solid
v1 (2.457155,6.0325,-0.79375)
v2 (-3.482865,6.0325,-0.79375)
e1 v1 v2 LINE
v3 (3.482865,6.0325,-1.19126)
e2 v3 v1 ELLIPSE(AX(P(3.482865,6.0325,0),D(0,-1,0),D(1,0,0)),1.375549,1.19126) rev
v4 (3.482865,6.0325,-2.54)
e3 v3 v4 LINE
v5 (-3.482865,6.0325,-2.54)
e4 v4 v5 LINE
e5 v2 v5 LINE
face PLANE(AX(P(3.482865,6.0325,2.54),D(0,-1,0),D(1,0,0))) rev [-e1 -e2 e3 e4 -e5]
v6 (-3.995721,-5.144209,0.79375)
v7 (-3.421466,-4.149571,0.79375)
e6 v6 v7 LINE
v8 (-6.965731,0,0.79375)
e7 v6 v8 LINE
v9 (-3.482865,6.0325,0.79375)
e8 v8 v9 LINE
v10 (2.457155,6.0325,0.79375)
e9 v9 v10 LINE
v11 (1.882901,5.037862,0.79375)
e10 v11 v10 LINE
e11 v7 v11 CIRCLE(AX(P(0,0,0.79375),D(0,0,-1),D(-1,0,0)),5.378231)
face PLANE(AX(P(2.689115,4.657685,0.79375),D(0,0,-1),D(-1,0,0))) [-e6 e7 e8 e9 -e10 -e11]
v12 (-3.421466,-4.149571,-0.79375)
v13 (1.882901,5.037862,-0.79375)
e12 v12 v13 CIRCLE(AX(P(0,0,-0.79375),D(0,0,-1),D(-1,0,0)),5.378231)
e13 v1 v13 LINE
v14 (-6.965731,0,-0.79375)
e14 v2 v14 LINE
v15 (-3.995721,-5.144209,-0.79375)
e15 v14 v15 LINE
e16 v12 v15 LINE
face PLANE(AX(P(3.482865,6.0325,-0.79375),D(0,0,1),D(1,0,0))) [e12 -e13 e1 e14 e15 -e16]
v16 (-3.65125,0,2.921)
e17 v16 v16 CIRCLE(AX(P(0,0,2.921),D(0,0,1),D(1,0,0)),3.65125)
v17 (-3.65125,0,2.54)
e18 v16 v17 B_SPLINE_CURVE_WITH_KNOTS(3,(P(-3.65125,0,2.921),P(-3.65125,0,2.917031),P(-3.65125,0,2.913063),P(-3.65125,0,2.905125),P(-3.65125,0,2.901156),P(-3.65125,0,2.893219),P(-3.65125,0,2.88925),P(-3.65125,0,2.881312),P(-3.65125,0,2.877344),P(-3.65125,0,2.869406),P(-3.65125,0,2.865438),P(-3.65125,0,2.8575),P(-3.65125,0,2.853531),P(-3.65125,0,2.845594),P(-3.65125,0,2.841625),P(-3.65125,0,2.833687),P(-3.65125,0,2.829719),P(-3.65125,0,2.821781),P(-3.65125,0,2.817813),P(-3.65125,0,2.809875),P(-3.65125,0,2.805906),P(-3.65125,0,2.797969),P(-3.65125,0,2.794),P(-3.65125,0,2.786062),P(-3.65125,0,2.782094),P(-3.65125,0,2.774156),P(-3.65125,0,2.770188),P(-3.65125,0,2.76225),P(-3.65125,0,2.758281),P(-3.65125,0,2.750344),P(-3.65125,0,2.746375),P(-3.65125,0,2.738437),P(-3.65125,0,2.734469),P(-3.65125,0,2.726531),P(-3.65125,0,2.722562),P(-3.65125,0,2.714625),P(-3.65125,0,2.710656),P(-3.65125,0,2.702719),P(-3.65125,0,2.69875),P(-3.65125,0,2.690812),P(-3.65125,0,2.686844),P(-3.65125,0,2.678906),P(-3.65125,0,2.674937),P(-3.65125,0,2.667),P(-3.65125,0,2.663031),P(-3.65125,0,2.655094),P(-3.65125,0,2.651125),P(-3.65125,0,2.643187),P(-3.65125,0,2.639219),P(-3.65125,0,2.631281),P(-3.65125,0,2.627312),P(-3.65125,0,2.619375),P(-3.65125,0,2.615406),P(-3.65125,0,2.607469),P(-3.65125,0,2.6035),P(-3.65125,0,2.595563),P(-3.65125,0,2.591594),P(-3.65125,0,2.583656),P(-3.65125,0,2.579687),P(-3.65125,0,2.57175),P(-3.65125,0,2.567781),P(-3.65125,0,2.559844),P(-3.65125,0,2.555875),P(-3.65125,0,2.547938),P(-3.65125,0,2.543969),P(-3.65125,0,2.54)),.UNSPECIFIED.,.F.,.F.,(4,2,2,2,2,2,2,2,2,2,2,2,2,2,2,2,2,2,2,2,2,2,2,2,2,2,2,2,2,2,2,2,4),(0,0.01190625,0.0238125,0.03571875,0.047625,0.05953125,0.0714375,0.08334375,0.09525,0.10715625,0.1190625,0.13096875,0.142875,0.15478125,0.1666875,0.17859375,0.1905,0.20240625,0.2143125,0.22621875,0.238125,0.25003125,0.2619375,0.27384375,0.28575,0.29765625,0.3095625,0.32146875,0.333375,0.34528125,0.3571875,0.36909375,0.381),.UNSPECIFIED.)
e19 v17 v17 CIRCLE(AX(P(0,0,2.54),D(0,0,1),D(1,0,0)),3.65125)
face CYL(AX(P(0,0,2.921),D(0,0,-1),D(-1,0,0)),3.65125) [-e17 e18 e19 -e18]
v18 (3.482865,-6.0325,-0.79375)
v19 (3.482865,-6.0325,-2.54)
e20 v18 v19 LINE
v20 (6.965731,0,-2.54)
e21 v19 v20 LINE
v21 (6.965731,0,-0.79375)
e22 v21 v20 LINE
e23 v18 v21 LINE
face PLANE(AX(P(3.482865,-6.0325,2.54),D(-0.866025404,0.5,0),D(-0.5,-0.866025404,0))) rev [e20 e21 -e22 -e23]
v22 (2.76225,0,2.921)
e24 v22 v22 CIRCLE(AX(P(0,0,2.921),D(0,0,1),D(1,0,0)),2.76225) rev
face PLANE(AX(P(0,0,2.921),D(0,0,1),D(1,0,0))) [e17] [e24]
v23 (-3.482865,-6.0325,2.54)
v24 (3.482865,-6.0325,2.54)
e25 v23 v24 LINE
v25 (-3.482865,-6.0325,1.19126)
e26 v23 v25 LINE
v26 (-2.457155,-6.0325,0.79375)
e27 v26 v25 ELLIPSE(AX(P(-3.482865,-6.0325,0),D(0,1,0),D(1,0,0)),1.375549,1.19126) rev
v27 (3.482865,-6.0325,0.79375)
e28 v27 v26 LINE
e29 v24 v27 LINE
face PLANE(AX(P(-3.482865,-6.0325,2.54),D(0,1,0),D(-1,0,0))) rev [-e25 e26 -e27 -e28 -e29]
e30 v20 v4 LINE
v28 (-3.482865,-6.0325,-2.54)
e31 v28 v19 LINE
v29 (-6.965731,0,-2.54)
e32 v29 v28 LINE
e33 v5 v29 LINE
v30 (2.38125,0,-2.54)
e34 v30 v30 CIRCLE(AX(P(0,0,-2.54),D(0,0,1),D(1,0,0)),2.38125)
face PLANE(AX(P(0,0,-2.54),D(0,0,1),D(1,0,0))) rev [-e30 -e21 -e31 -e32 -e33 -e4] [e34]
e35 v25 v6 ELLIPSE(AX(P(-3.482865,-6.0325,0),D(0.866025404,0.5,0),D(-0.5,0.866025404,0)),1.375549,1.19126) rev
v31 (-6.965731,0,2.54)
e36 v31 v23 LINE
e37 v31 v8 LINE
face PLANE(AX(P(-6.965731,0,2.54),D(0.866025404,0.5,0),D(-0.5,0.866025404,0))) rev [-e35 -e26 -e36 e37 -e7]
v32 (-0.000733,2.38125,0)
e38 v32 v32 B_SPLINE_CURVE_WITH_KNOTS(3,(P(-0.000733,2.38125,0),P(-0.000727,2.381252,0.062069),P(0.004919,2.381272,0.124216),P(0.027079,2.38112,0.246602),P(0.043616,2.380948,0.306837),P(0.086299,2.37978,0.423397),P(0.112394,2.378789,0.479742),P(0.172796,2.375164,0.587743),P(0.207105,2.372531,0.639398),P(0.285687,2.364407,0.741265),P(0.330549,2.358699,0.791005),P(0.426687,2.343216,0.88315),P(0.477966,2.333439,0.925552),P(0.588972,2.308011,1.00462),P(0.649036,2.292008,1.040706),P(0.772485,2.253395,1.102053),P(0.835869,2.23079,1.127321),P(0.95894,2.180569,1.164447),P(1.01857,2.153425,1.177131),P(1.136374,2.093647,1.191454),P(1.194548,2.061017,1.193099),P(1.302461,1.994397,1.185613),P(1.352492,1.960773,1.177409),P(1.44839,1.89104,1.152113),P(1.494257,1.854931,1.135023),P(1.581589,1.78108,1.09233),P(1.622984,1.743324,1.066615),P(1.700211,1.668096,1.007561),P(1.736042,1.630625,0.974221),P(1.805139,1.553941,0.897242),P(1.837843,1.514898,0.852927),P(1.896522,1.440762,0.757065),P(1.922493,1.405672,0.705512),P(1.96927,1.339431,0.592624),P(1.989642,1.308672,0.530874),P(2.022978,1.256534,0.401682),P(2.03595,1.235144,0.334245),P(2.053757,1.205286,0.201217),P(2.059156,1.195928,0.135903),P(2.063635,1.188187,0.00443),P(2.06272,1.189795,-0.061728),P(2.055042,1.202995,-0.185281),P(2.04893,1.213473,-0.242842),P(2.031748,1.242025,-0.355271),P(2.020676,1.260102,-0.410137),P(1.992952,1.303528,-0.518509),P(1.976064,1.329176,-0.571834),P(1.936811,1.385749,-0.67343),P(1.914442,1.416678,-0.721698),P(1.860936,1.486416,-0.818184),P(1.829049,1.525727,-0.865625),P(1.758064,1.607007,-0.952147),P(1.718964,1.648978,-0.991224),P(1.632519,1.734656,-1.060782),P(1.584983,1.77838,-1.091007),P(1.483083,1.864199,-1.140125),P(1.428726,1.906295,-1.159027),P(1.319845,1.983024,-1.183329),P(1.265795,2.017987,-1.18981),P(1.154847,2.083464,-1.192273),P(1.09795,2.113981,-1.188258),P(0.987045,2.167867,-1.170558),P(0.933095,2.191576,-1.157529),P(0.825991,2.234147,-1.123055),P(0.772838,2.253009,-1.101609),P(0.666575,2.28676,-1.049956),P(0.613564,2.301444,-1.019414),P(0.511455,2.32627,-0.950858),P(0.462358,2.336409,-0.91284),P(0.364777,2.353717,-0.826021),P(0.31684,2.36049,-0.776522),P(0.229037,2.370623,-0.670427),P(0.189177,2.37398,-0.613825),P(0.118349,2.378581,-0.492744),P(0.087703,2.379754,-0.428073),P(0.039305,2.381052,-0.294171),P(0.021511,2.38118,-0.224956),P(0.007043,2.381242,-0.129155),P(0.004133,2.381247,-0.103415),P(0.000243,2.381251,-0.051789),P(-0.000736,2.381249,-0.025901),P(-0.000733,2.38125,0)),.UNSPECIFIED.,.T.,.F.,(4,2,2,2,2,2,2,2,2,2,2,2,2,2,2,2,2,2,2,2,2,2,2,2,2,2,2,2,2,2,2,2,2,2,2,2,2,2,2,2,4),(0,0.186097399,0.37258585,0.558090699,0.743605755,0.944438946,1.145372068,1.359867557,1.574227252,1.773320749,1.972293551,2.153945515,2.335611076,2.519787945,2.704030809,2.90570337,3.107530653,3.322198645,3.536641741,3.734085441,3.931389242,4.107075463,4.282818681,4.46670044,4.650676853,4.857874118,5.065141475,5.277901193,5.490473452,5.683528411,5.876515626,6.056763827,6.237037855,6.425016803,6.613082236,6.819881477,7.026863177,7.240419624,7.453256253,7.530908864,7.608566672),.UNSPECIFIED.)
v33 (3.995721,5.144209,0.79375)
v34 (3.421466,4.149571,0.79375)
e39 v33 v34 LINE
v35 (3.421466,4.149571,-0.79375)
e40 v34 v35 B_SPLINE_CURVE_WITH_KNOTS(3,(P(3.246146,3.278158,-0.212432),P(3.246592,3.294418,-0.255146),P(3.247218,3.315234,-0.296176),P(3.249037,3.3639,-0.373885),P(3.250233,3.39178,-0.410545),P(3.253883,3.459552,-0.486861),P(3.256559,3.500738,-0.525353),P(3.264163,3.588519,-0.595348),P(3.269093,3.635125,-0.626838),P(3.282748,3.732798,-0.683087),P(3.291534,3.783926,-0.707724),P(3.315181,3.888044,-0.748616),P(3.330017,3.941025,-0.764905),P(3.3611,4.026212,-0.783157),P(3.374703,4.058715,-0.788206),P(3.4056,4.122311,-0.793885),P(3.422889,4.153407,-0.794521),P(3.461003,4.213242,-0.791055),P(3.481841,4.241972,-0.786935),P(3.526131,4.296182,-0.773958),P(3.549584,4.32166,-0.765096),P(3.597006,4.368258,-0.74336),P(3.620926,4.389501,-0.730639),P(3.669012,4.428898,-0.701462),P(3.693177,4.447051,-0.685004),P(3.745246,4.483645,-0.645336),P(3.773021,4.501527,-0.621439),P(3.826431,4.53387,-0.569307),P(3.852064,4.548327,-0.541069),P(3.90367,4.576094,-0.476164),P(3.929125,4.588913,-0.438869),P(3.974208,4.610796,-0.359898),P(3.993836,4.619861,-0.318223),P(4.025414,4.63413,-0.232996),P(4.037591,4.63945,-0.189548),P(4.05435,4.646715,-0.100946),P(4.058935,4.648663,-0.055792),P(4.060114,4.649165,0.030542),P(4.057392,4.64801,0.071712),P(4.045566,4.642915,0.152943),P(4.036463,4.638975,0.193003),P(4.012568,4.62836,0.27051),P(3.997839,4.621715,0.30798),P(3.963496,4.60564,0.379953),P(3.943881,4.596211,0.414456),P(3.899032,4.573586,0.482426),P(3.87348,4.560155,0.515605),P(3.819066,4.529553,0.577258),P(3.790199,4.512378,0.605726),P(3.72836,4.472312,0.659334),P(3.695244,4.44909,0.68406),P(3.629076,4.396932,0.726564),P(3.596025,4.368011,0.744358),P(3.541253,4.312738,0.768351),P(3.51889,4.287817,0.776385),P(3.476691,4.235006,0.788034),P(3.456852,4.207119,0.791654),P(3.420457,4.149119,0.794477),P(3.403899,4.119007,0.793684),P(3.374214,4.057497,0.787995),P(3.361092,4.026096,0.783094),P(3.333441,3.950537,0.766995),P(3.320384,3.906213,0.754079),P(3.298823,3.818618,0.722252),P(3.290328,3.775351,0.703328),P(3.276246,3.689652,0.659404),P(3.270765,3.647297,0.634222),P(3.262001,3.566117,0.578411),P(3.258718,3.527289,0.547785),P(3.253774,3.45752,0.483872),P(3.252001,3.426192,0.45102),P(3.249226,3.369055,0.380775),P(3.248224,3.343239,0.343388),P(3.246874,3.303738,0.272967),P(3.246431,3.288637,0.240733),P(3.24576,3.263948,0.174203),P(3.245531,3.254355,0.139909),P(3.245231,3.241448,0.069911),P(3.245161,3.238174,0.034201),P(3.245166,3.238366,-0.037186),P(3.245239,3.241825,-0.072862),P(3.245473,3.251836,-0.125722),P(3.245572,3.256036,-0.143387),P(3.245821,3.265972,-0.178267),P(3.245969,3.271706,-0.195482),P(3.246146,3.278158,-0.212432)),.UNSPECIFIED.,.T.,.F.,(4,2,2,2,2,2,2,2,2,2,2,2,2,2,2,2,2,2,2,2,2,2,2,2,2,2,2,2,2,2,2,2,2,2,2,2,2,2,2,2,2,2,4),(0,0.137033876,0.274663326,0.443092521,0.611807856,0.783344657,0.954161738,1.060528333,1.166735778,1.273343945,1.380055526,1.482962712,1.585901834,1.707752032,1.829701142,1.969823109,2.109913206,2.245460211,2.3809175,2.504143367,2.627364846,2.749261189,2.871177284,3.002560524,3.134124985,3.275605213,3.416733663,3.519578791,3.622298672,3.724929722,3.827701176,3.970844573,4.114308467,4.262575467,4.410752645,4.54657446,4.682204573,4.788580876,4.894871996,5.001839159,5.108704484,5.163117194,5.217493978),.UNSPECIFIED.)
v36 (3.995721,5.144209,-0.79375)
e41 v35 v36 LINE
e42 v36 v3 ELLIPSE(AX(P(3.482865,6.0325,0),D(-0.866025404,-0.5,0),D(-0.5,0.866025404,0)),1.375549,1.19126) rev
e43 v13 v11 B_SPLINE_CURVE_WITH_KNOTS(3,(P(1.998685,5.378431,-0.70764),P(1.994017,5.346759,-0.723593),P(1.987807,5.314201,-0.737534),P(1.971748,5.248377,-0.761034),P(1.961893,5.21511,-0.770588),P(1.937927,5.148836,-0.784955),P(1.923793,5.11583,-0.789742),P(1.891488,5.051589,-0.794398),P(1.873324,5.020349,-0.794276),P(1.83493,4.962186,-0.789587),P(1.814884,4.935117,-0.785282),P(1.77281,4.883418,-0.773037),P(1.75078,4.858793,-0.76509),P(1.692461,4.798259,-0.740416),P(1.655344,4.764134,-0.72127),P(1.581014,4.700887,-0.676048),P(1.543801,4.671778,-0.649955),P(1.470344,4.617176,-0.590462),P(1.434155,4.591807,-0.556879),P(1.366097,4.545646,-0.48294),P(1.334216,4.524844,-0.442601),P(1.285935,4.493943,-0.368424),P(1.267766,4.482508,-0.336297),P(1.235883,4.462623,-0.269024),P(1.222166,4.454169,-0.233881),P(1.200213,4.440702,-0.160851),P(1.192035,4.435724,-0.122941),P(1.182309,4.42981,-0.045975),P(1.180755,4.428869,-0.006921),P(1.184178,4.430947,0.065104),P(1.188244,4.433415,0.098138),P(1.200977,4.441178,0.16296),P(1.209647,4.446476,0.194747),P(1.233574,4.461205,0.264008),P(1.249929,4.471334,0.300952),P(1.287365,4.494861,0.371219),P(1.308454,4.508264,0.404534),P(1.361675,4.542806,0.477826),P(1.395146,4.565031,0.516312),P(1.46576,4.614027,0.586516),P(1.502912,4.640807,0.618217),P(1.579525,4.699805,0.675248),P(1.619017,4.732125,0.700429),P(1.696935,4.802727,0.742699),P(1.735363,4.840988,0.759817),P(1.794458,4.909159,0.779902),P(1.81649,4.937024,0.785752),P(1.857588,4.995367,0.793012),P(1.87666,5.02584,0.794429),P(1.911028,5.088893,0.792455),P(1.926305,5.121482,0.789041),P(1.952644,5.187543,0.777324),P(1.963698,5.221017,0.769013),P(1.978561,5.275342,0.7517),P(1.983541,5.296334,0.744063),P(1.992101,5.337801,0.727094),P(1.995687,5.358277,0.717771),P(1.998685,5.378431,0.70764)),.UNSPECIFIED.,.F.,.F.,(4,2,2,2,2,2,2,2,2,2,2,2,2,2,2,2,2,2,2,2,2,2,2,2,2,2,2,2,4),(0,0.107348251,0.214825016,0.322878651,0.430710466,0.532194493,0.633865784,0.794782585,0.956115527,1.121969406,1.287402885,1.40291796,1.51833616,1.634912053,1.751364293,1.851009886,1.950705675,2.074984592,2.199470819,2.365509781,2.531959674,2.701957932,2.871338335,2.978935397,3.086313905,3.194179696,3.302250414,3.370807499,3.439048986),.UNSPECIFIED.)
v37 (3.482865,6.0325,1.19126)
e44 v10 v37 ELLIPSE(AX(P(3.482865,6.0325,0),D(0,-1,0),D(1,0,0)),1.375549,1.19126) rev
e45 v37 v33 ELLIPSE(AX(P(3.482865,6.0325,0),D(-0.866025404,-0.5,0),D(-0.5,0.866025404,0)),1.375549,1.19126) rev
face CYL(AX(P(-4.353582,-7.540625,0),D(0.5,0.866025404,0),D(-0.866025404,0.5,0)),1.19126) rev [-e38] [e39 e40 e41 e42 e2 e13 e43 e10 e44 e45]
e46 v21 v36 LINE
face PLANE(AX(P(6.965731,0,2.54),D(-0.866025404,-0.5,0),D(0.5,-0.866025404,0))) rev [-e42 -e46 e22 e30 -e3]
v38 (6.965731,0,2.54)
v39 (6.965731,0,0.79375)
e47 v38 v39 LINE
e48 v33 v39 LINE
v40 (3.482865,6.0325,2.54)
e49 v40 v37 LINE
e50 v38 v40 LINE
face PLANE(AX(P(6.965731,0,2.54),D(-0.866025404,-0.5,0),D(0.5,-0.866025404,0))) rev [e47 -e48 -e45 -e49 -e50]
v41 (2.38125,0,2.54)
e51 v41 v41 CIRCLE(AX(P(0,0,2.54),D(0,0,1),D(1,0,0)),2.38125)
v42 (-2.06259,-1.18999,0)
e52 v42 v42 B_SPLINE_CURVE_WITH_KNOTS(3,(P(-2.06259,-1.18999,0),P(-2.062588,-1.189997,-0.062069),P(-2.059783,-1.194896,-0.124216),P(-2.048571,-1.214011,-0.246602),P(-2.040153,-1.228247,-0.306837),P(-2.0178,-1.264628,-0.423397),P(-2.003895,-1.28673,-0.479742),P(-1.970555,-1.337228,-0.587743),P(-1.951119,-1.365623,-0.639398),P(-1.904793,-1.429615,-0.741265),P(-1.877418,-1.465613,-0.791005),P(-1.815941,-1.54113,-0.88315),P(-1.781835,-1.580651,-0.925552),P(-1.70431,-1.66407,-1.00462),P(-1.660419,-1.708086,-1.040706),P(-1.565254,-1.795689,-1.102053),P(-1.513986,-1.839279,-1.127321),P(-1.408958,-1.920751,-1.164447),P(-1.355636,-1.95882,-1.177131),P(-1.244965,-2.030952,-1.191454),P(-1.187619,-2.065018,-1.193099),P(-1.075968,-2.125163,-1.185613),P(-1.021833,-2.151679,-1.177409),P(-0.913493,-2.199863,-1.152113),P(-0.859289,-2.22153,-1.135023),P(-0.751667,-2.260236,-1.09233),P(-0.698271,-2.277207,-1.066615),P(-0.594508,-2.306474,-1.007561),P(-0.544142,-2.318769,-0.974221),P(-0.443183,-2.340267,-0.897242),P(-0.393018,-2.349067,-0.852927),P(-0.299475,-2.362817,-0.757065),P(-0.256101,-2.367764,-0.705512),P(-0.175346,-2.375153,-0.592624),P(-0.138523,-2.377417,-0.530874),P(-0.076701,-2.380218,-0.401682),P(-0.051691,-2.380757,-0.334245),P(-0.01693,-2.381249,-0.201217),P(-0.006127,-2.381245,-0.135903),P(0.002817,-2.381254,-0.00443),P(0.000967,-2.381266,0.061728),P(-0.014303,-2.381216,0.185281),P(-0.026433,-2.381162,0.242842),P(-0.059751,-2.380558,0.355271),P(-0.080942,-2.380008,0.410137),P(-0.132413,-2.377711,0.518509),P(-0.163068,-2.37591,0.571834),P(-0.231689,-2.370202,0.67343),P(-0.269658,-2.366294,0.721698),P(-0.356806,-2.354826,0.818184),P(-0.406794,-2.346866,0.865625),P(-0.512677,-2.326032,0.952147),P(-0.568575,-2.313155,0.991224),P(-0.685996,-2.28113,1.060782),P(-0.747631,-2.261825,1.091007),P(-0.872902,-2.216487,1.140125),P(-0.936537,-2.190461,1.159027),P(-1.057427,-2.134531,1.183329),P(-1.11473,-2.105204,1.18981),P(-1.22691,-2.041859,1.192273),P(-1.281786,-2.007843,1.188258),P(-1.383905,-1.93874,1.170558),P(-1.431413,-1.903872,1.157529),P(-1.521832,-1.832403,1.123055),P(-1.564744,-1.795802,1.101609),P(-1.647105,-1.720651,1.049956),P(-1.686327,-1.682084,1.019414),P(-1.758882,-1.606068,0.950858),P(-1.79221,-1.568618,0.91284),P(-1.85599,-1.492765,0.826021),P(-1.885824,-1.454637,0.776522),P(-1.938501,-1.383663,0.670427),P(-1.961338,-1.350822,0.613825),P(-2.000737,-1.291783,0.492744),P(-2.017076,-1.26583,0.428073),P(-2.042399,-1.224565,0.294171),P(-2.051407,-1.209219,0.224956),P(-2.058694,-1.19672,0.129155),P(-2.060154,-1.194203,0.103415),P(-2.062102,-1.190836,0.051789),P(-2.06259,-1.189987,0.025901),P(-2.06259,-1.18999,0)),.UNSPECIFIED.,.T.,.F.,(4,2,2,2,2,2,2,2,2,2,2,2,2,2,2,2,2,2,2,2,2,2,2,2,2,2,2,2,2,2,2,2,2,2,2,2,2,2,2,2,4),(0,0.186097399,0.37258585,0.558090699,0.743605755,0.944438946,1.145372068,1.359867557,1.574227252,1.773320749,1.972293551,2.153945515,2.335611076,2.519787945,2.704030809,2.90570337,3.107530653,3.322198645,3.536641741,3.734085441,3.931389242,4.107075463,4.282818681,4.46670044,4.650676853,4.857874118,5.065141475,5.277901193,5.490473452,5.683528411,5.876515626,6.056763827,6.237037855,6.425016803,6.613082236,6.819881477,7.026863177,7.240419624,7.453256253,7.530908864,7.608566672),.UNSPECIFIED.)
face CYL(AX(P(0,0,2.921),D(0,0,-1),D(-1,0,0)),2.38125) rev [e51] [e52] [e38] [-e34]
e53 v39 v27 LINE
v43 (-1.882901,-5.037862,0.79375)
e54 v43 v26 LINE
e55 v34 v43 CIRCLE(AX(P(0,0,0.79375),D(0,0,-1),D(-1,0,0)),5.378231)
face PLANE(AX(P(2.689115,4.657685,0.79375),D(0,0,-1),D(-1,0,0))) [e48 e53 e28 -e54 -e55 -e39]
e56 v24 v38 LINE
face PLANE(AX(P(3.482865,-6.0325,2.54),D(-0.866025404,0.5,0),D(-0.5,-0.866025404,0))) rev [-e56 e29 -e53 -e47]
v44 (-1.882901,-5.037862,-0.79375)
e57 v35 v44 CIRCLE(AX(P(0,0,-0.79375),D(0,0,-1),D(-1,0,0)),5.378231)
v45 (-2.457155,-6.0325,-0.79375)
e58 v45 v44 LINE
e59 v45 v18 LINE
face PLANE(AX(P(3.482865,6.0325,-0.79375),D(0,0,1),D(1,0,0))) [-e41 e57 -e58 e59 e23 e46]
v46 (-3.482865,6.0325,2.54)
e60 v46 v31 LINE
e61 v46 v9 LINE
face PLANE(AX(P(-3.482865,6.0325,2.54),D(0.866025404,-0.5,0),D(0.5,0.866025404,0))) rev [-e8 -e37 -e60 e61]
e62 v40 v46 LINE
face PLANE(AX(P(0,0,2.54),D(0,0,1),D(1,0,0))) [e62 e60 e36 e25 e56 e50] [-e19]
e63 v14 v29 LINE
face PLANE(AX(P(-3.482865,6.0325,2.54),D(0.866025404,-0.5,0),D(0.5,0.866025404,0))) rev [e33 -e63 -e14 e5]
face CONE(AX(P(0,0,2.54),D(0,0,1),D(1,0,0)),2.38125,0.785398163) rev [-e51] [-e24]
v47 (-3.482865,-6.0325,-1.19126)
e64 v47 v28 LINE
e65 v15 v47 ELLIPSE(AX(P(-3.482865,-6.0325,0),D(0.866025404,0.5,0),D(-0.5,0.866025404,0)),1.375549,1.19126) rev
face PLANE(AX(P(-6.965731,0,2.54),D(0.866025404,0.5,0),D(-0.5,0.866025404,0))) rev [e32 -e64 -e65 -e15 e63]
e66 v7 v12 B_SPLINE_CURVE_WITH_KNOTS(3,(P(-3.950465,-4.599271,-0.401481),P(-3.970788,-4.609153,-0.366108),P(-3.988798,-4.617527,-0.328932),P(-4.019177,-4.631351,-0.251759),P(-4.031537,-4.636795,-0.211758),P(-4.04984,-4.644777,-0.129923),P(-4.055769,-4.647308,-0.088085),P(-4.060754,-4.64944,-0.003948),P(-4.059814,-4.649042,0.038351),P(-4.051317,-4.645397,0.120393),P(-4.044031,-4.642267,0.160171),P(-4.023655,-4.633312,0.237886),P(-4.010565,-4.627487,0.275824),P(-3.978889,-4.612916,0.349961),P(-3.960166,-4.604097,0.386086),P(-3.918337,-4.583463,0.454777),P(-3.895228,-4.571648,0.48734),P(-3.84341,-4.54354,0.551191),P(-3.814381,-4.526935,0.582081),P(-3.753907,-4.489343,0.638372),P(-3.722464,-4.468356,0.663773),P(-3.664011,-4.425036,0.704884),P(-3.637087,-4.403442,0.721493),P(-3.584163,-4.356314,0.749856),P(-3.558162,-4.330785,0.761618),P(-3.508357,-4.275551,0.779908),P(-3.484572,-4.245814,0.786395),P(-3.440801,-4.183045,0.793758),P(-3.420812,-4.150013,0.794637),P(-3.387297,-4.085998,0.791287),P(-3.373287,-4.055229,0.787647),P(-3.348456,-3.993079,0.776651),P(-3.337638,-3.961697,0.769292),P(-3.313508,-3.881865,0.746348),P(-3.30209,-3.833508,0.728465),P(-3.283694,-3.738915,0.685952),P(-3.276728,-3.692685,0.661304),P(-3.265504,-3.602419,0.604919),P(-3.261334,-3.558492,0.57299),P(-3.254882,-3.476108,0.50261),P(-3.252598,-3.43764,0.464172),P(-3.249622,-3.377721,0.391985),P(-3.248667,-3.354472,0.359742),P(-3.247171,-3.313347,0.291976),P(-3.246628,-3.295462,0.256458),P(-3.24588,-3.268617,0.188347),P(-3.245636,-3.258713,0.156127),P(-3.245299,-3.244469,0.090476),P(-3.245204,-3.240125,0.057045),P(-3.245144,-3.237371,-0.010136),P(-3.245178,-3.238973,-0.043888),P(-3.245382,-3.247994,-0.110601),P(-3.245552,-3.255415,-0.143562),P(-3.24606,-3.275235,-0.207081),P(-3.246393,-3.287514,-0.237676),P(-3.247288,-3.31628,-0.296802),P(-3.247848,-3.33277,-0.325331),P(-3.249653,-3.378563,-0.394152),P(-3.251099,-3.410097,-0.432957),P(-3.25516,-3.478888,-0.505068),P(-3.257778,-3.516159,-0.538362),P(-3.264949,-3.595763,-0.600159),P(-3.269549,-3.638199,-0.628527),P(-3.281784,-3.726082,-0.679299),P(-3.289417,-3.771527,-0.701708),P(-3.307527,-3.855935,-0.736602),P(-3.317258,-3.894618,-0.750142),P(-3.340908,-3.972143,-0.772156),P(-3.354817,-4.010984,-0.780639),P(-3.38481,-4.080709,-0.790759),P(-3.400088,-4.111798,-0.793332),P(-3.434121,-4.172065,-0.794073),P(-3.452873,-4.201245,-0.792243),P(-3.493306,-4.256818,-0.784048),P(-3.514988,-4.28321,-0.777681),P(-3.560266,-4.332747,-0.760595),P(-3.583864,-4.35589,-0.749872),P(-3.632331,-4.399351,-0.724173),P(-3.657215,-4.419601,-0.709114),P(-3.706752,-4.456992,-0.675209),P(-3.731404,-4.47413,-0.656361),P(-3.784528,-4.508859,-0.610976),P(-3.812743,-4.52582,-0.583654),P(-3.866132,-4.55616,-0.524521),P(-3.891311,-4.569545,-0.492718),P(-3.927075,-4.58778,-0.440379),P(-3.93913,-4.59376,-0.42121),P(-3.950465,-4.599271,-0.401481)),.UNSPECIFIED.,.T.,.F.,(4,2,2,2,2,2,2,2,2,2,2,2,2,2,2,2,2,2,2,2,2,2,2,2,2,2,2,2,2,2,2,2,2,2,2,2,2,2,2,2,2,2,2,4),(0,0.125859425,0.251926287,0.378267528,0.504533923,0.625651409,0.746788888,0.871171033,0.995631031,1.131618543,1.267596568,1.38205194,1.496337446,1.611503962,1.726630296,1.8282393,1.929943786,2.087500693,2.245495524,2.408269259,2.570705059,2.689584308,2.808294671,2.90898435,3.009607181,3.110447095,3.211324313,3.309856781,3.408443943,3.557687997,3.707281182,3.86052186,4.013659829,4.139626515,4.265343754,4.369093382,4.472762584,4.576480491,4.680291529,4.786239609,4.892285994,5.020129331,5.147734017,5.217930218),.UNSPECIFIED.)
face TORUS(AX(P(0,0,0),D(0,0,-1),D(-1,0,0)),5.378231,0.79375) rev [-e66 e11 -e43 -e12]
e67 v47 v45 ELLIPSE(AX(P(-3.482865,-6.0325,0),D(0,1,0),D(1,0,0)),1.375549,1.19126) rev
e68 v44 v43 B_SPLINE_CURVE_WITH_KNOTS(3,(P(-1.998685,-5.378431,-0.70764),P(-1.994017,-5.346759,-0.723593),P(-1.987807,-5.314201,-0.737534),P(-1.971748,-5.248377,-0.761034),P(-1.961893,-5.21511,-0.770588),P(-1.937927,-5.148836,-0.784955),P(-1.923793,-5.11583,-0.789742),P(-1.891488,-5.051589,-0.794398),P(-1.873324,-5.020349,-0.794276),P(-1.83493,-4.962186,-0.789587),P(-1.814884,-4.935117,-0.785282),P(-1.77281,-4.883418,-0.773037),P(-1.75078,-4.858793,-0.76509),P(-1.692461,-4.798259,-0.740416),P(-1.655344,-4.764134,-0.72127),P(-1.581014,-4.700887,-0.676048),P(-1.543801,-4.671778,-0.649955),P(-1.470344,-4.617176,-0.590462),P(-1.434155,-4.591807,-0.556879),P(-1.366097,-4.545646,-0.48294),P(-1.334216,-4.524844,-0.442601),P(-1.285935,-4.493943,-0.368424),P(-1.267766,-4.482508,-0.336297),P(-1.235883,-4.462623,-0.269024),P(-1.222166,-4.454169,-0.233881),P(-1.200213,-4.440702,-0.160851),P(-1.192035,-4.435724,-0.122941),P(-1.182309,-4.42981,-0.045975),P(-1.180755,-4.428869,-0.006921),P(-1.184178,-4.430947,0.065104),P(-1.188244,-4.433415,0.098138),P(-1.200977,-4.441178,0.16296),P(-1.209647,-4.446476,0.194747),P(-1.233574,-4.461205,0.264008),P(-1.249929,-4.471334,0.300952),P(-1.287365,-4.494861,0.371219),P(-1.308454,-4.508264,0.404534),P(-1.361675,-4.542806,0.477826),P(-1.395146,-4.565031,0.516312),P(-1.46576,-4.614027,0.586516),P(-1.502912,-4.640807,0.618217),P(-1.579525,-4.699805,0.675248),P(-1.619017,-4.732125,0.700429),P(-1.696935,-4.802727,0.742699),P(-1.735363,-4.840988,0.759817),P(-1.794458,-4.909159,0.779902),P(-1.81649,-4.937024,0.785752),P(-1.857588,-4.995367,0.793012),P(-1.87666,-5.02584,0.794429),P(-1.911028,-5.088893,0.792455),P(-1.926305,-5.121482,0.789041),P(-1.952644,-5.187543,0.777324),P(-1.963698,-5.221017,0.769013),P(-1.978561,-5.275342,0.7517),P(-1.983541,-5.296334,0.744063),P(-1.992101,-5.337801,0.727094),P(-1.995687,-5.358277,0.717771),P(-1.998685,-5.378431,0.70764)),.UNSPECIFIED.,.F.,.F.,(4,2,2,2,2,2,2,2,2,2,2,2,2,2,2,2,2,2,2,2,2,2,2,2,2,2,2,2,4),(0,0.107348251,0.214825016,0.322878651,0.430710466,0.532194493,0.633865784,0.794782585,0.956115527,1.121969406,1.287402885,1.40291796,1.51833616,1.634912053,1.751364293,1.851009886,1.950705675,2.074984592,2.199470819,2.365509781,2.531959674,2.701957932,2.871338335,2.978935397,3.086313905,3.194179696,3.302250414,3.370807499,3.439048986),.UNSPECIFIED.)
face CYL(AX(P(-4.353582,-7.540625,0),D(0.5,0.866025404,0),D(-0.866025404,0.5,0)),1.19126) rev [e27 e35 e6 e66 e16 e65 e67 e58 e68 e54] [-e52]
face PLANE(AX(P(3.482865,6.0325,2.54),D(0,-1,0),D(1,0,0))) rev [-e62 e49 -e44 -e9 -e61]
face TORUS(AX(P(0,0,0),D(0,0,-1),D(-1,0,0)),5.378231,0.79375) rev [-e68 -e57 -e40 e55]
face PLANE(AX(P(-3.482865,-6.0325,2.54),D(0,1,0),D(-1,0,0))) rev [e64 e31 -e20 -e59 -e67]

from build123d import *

# Parameters (mm, degrees)
BOSS_EXTRUDE1_DEPTH = 2.54
SKETCH2_R           = 3.65125
SKETCH2_R_2         = 2.38125
BOSS_EXTRUDE2_DEPTH = 0.381
SKETCH3_R           = 2.38125
CUT_EXTRUDE1_DEPTH  = 11.522303198
CHAMFER1_SIZE       = 0.381
SKETCH4_R           = 1.19126
CUT_EXTRUDE2_DEPTH  = 17.225585806


with BuildPart() as part:
    # Sketch1 → Boss-Extrude1 (new, symmetric)
    with BuildSketch(Plane.XY):
        Polygon((3.482865499, 6.0325), (-3.482865499, 6.0325), (-6.965730998, 0), (-3.482865499, -6.0325), (3.482865499, -6.0325), (6.965730998, 0), align=None)
    extrude(amount=BOSS_EXTRUDE1_DEPTH, both=True)

    # Sketch2 → Boss-Extrude2 (add)
    with BuildSketch(Plane.XY.offset(2.54)):
        with Locations(Location((0, 0, 0), (0, 0, 180))):
            Circle(SKETCH2_R)
        with Locations(Location((0, 0, 0), (0, 0, 180))):
            Circle(SKETCH2_R_2, mode=Mode.SUBTRACT)
    extrude(amount=BOSS_EXTRUDE2_DEPTH)

    # Sketch3 → Cut-Extrude1 (cut, through all)
    with BuildSketch(Plane.XY.offset(2.54)):
        with Locations(Location((0, 0, 0), (0, 0, 180))):
            Circle(SKETCH3_R)
    extrude(amount=-CUT_EXTRUDE1_DEPTH, mode=Mode.SUBTRACT)

    # Chamfer1
    chamfer1_edges = [part.edges().sort_by_distance(p)[0] for p in [
        (2.38125, 0, 2.921),
    ]]
    chamfer(chamfer1_edges, length=CHAMFER1_SIZE - 0.0001)  # a hair under: the kernel refuses the full size

    # Sketch4 → Cut-Extrude2 (cut, through all)
    with BuildSketch(Plane(origin=(3.482865499, 6.0325, 0), x_dir=(0, 0, -1), z_dir=(-0.49999999999999944, -0.8660254037844389, 0))):
        with Locations(Location((0, 0, 0), (0, 0, 270))):
            Circle(SKETCH4_R)
    extrude(amount=CUT_EXTRUDE2_DEPTH, mode=Mode.SUBTRACT)

    # Sketch5 → Cut-Revolve1 (revolve, cut)
    with BuildSketch(Plane(origin=(0, 0, 0), x_dir=(0, 0, 1), z_dir=(-0.8660254037844389, 0.4999999999999995, 0)), mode=Mode.PRIVATE) as cut_revolve1_sk:
        with BuildLine():
            Line((-0.79375, 6.965730998), (-0.79375, 5.378230998))
            ThreePointArc((-0.79375, 5.378230998), (0, 4.584480998), (0.79375, 5.378230998))
            Line((0.79375, 5.378230998), (0.79375, 6.965730998))
            Line((0.79375, 6.965730998), (-0.79375, 6.965730998))
        make_face()
    revolve(cut_revolve1_sk.sketch.rotate(Axis((0, 0, -1000.088934232), (0, 0, 1)), 300), axis=Axis((0, 0, -1000.088934232), (0, 0, 1)), mode=Mode.SUBTRACT)


solid = part.part
